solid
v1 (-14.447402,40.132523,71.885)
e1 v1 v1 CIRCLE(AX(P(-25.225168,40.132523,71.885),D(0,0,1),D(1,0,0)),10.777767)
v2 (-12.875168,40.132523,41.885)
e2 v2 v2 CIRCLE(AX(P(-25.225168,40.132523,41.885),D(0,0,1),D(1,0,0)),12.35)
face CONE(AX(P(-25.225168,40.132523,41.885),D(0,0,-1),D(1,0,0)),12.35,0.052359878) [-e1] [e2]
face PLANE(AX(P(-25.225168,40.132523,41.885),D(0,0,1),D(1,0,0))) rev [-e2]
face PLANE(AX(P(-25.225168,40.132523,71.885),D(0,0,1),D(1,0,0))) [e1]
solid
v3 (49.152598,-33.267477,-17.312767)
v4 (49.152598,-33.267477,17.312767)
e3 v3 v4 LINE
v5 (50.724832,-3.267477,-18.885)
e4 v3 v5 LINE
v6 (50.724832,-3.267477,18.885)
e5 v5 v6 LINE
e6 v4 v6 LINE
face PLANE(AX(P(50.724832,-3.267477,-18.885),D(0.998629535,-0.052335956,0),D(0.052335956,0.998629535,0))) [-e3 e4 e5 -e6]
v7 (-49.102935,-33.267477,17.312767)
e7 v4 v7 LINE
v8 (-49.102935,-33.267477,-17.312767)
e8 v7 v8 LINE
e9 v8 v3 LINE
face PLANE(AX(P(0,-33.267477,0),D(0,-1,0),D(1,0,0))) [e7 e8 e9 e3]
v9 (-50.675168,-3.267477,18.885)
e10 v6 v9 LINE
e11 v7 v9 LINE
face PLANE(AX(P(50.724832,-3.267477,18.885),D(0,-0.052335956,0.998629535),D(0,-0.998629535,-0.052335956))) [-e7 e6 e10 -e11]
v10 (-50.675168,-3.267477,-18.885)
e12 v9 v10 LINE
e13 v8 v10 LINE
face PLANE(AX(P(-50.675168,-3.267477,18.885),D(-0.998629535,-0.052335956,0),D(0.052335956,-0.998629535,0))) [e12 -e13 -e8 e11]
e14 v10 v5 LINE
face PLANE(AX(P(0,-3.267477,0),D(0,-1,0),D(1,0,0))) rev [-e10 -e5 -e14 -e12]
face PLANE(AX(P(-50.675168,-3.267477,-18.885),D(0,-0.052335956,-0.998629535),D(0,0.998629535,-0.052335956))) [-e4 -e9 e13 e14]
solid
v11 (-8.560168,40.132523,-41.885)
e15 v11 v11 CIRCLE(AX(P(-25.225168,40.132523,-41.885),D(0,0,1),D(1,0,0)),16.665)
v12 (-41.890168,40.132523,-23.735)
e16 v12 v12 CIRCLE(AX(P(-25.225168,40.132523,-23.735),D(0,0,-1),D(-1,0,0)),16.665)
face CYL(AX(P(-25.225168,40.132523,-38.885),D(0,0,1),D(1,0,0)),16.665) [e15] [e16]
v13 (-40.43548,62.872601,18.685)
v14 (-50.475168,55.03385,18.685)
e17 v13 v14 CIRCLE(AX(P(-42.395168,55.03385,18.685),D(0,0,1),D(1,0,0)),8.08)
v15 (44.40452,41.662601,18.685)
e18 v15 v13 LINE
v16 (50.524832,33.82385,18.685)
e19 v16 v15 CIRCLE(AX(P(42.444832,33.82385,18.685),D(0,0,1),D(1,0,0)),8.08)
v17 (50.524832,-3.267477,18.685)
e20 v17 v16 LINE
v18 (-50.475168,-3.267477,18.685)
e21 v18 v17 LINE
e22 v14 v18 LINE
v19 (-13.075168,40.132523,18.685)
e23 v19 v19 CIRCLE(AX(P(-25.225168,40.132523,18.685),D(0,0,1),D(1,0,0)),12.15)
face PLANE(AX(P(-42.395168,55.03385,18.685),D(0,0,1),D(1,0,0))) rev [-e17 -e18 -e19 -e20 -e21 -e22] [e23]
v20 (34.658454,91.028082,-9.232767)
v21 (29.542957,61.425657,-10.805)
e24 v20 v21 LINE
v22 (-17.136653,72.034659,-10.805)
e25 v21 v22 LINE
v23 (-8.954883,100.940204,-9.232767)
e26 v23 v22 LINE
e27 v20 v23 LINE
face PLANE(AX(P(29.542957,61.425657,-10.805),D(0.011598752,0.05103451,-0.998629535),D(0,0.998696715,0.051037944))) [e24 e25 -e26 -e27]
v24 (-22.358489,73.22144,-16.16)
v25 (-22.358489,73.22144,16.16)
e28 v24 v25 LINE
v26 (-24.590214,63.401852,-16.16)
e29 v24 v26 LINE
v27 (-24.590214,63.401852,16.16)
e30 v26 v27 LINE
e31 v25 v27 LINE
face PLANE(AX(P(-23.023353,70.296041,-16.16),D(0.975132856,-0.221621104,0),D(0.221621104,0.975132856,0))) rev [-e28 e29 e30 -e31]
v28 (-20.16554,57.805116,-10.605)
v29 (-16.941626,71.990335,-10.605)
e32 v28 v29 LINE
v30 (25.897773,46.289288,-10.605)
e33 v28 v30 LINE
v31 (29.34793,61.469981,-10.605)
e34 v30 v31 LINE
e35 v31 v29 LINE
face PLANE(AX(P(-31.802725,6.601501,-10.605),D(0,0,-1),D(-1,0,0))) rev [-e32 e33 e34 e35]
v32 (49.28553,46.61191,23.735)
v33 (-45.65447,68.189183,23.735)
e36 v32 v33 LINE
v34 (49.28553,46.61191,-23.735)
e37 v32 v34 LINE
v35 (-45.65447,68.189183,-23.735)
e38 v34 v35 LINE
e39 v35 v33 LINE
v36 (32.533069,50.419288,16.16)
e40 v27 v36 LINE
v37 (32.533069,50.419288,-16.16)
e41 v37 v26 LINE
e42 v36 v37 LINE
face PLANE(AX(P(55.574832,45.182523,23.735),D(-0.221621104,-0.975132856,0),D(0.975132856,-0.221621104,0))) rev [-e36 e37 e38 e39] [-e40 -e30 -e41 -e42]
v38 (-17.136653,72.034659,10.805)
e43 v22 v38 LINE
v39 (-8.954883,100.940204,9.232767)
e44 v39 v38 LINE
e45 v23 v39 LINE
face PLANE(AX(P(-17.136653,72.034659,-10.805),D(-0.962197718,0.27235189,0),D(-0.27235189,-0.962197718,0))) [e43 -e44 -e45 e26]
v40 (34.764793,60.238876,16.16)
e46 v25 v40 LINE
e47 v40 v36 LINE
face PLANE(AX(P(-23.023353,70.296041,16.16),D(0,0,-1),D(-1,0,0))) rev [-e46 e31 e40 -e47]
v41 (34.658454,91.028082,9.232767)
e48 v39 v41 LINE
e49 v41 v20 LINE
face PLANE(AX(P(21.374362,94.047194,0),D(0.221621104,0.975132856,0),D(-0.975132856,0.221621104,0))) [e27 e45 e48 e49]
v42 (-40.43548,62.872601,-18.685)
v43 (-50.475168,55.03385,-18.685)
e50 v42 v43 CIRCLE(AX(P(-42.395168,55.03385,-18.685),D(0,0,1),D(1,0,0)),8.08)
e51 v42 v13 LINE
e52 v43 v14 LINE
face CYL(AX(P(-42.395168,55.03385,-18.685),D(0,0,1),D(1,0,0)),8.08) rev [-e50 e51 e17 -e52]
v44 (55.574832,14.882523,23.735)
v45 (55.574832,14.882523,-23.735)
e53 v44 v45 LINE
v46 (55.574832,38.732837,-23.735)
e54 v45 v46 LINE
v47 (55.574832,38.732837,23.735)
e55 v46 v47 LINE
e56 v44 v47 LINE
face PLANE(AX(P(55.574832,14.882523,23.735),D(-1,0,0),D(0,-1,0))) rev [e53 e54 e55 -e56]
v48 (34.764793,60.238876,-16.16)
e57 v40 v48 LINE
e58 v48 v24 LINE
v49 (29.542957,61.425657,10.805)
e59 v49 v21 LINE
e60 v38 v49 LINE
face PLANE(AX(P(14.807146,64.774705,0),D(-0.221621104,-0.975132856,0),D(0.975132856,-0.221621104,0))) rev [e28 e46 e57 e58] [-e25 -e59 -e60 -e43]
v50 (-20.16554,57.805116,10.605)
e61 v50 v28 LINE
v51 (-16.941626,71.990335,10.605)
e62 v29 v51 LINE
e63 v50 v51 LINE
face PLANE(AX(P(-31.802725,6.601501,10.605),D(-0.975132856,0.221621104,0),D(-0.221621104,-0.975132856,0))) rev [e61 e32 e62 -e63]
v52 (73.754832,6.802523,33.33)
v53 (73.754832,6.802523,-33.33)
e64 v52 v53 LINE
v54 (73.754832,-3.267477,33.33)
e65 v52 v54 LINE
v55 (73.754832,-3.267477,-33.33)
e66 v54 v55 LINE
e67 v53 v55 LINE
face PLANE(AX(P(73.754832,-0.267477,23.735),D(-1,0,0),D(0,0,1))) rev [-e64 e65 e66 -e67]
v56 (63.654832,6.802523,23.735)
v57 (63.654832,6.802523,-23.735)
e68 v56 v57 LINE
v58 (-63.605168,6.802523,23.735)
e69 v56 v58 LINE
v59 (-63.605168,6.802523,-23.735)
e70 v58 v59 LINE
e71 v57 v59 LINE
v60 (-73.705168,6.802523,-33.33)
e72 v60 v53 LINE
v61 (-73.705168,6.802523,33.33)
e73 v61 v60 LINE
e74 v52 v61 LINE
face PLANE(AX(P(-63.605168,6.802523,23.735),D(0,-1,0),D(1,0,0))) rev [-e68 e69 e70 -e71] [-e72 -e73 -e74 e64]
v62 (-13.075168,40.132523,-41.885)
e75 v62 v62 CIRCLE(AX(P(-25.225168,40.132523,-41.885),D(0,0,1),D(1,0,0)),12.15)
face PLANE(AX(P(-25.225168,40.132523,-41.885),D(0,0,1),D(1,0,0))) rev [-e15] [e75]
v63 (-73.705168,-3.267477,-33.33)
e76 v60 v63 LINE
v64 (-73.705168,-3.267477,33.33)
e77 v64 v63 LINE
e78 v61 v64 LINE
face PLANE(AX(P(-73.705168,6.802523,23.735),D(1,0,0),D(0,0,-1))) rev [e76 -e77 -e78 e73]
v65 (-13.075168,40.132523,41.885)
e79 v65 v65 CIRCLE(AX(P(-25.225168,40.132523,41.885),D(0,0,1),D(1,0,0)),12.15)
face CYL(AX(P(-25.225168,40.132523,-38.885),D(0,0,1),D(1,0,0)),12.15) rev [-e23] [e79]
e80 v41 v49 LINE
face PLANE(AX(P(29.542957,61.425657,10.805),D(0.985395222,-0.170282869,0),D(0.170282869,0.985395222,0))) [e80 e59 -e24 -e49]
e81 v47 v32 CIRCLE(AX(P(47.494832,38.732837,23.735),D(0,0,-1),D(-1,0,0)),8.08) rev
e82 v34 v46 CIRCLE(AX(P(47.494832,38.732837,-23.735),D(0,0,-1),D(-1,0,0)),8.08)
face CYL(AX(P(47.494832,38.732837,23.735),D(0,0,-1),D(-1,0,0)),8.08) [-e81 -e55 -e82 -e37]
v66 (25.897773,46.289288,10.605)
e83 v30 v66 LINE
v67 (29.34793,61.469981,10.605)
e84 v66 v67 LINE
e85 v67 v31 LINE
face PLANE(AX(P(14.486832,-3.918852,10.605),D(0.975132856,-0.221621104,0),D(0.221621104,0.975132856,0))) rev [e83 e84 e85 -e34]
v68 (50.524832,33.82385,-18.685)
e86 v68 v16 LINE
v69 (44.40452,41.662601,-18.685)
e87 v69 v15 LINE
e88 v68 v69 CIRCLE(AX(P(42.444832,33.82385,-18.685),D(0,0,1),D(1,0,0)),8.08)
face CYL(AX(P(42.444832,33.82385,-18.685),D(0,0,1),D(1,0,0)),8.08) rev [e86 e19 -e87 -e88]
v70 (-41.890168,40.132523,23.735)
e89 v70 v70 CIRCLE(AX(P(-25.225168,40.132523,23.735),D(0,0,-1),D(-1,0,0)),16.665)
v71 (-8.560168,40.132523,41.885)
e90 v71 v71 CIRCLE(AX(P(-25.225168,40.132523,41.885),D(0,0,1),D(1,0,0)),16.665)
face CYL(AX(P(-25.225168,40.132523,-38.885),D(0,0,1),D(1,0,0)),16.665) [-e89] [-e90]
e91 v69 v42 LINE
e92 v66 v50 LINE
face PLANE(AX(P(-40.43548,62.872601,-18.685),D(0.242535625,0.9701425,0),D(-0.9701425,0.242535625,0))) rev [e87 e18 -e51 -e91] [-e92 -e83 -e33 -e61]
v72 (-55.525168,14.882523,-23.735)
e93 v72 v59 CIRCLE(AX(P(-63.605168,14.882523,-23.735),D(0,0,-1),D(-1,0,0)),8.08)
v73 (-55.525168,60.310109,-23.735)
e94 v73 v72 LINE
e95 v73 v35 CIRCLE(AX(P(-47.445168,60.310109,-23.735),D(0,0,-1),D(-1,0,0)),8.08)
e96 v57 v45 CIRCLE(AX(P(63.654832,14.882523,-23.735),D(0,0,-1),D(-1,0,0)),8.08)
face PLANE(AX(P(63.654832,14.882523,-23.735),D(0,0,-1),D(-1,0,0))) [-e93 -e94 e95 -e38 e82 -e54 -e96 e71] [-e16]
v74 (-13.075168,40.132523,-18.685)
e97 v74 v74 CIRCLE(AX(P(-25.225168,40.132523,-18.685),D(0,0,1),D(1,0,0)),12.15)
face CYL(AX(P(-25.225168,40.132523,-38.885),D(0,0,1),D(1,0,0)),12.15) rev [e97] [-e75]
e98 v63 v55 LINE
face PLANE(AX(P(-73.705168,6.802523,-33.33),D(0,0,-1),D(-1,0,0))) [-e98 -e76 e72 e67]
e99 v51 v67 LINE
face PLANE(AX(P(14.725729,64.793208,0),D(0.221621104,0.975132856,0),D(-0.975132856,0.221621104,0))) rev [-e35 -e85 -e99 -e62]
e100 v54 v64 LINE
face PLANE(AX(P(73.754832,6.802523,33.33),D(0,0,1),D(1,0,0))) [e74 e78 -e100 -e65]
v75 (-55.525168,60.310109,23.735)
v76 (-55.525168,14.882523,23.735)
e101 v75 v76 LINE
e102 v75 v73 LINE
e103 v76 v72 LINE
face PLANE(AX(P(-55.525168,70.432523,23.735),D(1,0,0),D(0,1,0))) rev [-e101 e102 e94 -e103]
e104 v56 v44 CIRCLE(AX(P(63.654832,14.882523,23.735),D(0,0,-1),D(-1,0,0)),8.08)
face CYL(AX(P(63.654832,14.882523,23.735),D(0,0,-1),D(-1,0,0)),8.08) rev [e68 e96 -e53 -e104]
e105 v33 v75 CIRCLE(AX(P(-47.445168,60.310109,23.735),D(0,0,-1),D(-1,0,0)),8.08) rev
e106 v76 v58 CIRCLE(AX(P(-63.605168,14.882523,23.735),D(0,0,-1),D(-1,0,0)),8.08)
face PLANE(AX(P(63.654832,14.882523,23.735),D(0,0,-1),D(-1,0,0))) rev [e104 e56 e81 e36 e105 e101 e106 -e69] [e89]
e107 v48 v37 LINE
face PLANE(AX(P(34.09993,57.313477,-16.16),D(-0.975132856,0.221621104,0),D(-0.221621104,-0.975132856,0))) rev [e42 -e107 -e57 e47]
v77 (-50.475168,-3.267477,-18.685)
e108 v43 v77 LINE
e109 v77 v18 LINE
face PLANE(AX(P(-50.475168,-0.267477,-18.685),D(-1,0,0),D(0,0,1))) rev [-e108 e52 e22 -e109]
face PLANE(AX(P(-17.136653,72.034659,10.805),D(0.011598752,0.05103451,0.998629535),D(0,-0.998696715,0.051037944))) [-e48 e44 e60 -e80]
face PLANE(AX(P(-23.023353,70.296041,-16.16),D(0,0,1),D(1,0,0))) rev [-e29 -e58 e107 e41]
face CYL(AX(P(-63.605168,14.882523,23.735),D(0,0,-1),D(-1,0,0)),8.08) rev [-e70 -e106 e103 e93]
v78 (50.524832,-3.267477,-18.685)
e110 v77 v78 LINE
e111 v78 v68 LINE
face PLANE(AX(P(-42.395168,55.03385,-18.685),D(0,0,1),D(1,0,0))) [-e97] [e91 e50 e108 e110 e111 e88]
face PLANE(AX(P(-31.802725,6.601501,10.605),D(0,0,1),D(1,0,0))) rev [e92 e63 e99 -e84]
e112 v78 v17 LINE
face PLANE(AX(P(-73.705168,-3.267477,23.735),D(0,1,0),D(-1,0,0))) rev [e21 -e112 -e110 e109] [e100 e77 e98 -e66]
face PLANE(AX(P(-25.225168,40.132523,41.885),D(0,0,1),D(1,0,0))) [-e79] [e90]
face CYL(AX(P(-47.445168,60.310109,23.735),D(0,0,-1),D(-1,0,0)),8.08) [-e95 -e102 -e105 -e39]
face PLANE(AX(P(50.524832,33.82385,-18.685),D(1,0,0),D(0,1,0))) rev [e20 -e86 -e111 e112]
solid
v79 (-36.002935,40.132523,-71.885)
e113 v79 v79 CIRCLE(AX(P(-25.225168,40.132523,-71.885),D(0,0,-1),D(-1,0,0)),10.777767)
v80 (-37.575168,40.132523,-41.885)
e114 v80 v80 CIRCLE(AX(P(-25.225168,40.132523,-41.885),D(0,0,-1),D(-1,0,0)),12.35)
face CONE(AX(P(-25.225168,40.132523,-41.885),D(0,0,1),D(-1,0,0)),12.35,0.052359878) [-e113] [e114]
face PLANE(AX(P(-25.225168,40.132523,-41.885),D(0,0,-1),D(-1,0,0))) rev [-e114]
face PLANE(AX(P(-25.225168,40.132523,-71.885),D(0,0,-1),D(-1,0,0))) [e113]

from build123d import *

# Parameters (mm, degrees)
BOSS_EXTRUDE1_DEPTH      = 23.5
BOSS_EXTRUDE2_DEPTH      = 15
BOSS_EXTRUDE2_DEPTH_BACK = 62
SKETCH2_R                = 16.5
CUT_EXTRUDE1_DEPTH       = 18.5
SKETCH4_R                = 15
CUT_EXTRUDE2_DEPTH       = 128.114121953
FILLET1_R                = 8
SKETCH5_W                = 58
SKETCH5_H                = 32
BOSS_EXTRUDE3_DEPTH      = 7
CUT_EXTRUDE4_REACH       = 115.269
SKETCH6_W                = 47
SKETCH6_H                = 21
SKETCH7_W                = 146
SKETCH7_H                = 66
SKETCH7_W_2              = 100
SKETCH7_H_2              = 37
BOSS_EXTRUDE5_DEPTH      = 7
SCALE1_SCALE             = 1.01
MOVE_START               = -33.33
MOVE_FACE1_OUTLINE_W     = 147.46
MOVE_FACE1_OUTLINE_H     = 3
MOVE_FACE1_OUTLINE_R     = 15.15
MOVE_FACE1_OUTLINE_R_2   = 12.15
MOVE_FACE1_DEPTH         = 14.645
MOVE_START_2             = 18.685
MOVE_FACE1_2_OUTLINE_W   = 147.46
MOVE_FACE1_2_OUTLINE_H   = 3
MOVE_FACE1_2_OUTLINE_R   = 15.15
MOVE_FACE1_2_OUTLINE_R_2 = 12.15
MOVE_FACE1_2_DEPTH       = 14.645
MOVE_START_3             = -16.16
MOVE_FACE1_3_OUTLINE_W   = 23.23
MOVE_FACE1_3_OUTLINE_H   = 3
MOVE_FACE1_3_DEPTH       = 32.32
MOVE_START_4             = -41.885
MOVE_FACE1_4_OUTLINE_R   = 16.665
MOVE_FACE1_4_OUTLINE_R_2 = 12.15
MOVE_FACE1_4_DEPTH       = 8.555
MOVE_START_5             = 33.33
MOVE_FACE1_5_OUTLINE_R   = 16.665
MOVE_FACE1_5_OUTLINE_R_2 = 12.15
MOVE_FACE1_5_DEPTH       = 8.555
MOVE_FACE1_6_DEPTH       = 5.555
MOVE_START_6             = 10.605
MOVE_FACE1_7_DEPTH       = 5.555
MOVE_START_7             = -18.685
MOVE_FACE1_8_OUTLINE_W   = 23.23
MOVE_FACE1_8_OUTLINE_H   = 3
MOVE_FACE1_8_DEPTH       = 37.37
SKETCH8_R                = 12.35
BOSS_EXTRUDE6_DEPTH      = 30
BOSS_EXTRUDE6_TAPER      = 3
SKETCH9_R                = 12.35
BOSS_EXTRUDE7_DEPTH      = 30
BOSS_EXTRUDE7_TAPER      = 3
SKETCH12_W               = 47.87
SKETCH12_H               = 21.61
BOSS_EXTRUDE10_DEPTH     = 30
BOSS_EXTRUDE10_TAPER     = 3
SKETCH11_W               = 101.4
SKETCH11_H               = 37.77
BOSS_EXTRUDE9_DEPTH      = 30
BOSS_EXTRUDE9_TAPER      = 3


# Read off the part's stored shape, not the designer's step: Move Face1
with BuildPart() as part:
    # Sketch1 → Boss-Extrude1 (new, symmetric)
    with BuildSketch(Plane.XY):
        with BuildLine():
            Line((-73, 0), (73, 0))
            Line((73, 0), (73, 7))
            Line((73, 7), (63, 7))
            ThreePointArc((63, 7), (57.343145751, 9.343145751), (55, 15))
            Line((55, 15), (55, 45))
            Line((55, 45), (-55, 70))
            Line((-55, 70), (-55, 15))
            ThreePointArc((-55, 15), (-57.343145751, 9.343145751), (-63, 7))
            Line((-63, 7), (-73, 7))
            Line((-73, 7), (-73, 0))
        make_face()
    extrude(amount=BOSS_EXTRUDE1_DEPTH, both=True)

    # Sketch2 → Boss-Extrude2 (add, two sides: drawn at the far end of the back side and taken through both)
    with BuildSketch(Plane.XY.offset(23.5).offset(-BOSS_EXTRUDE2_DEPTH_BACK)):
        with Locations((-25, 40)):
            Circle(SKETCH2_R)
    extrude(amount=BOSS_EXTRUDE2_DEPTH + BOSS_EXTRUDE2_DEPTH_BACK)

    # Sketch3 → Cut-Extrude1 (cut, symmetric)
    with BuildSketch(Plane.XY):
        with BuildLine():
            Line((-50, 0), (-50, 54.753788749))
            ThreePointArc((-50, 54.753788749), (-46.923297675, 61.059432253), (-40.059715, 62.51492875))
            Line((-40.059715, 62.51492875), (43.940285, 41.51492875))
            ThreePointArc((43.940285, 41.51492875), (48.305643504, 38.677086424), (50, 33.753788749))
            Line((50, 33.753788749), (50, 0))
            Line((50, 0), (-50, 0))
        make_face()
    extrude(amount=CUT_EXTRUDE1_DEPTH, both=True, mode=Mode.SUBTRACT)

    # Sketch4 → Cut-Extrude2 (cut, through all)
    with BuildSketch(Plane.XY.offset(38.5)):
        with Locations((-25, 40)):
            Circle(SKETCH4_R)
    extrude(amount=-CUT_EXTRUDE2_DEPTH, mode=Mode.SUBTRACT)

    # Fillet1
    fillet1_edges = [part.edges().sort_by_distance(p)[0] for p in [
        (-55, 70, 0),
        (55, 45, 0),
    ]]
    fillet(fillet1_edges, radius=FILLET1_R)

    # Sketch5 → Boss-Extrude3 (add)
    with BuildSketch(Plane(origin=(12.42632613, 54.675834971, 0), x_dir=(0.9751328557914598, -0.2216211035889682, 0), z_dir=(0.22162110358896822, 0.9751328557914599, 0))):
        with Locations((-8.736046198, 0)):
            Rectangle(SKETCH5_W, SKETCH5_H)
    extrude(amount=BOSS_EXTRUDE3_DEPTH)

    # Cut-Extrude4: up to this plane
    cut_extrude4_end = Plane(origin=(-40.059715, 62.51492875, -18.5), z_dir=(0.24253562503633289, 0.970142500145332, 0))
    # Sketch6 → Cut-Extrude4 (cut, up to the surface)
    with BuildSketch(Plane(origin=(13.977673855, 61.501764961, 0), x_dir=(0.9751328557914598, -0.2216211035889683, 0), z_dir=(0.2216211035889683, 0.9751328557914598, 0)), mode=Mode.PRIVATE) as cut_extrude4_sk1:
        with Locations((-8.736046198, 0)):
            Rectangle(SKETCH6_W, SKETCH6_H)
    cut_extrude4_tool1 = split(extrude(cut_extrude4_sk1.sketch, amount=-CUT_EXTRUDE4_REACH, mode=Mode.PRIVATE), bisect_by=cut_extrude4_end, keep=Keep.BOTH, mode=Mode.PRIVATE)
    add(cut_extrude4_tool1.solids().sort_by_distance((5.458868, 63.437857, 0))[0], mode=Mode.SUBTRACT)

    # Sketch7 → Boss-Extrude5 (add)
    with BuildSketch(Plane.XZ):
        Rectangle(SKETCH7_W, SKETCH7_H)
        Rectangle(SKETCH7_W_2, SKETCH7_H_2, mode=Mode.SUBTRACT)
    extrude(amount=-BOSS_EXTRUDE5_DEPTH)


with BuildPart() as part_1:
    # Scale1: scaled about (-2.483179367, 26.747657508, 0)
    add(part.part.scale(SCALE1_SCALE).moved(Location((0.024831794, -0.267476575, 0))))

    # Move Face1 outline → Move Face1 (add)
    # profile 1 of 2: a face of its own
    with BuildSketch(Plane.XY.offset(MOVE_START)):
        with Locations((0.024831794, -1.767476575)):
            Rectangle(MOVE_FACE1_OUTLINE_W, MOVE_FACE1_OUTLINE_H)
    # profile 2 of 2: a face of its own
    with BuildSketch(Plane.XY.offset(MOVE_START)):
        with Locations((-25.225168206, 40.132523425)):
            Circle(MOVE_FACE1_OUTLINE_R)
        with Locations((-25.225168206, 40.132523425)):
            Circle(MOVE_FACE1_OUTLINE_R_2, mode=Mode.SUBTRACT)
    extrude(amount=MOVE_FACE1_DEPTH)

    # Move Face1 2 outline → Move Face1 2 (add)
    # profile 1 of 2: a face of its own
    with BuildSketch(Plane.XY.offset(MOVE_START_2)):
        with Locations((0.024831794, -1.767476575)):
            Rectangle(MOVE_FACE1_2_OUTLINE_W, MOVE_FACE1_2_OUTLINE_H)
    # profile 2 of 2: a face of its own
    with BuildSketch(Plane.XY.offset(MOVE_START_2)):
        with Locations((-25.225168206, 40.132523425)):
            Circle(MOVE_FACE1_2_OUTLINE_R)
        with Locations((-25.225168206, 40.132523425)):
            Circle(MOVE_FACE1_2_OUTLINE_R_2, mode=Mode.SUBTRACT)
    extrude(amount=MOVE_FACE1_2_DEPTH)

    # Move Face1 3 outline → Move Face1 3 (add)
    with BuildSketch(Plane.XY.offset(MOVE_START_3)):
        with Locations((62.139831794, -1.767476575)):
            Rectangle(MOVE_FACE1_3_OUTLINE_W, MOVE_FACE1_3_OUTLINE_H)
        with Locations((-62.090168206, -1.767476575)):
            Rectangle(MOVE_FACE1_3_OUTLINE_W, MOVE_FACE1_3_OUTLINE_H)
        Polygon((34.099929999, 57.313477033), (34.76479331, 60.2388756), (29.347930296, 61.46998083), (28.683066985, 58.544582263), align=None)
        Polygon((-17.606489679, 69.064936051), (-16.941626368, 71.990334618), (-22.358489382, 73.221439848), (-23.023352693, 70.296041281), align=None)
    extrude(amount=MOVE_FACE1_3_DEPTH)

    # Move Face1 4 outline → Move Face1 4 (add)
    with BuildSketch(Plane.XY.offset(MOVE_START_4)):
        with Locations((-25.225168206, 40.132523425)):
            Circle(MOVE_FACE1_4_OUTLINE_R)
        with Locations((-25.225168206, 40.132523425)):
            Circle(MOVE_FACE1_4_OUTLINE_R_2, mode=Mode.SUBTRACT)
    extrude(amount=MOVE_FACE1_4_DEPTH)

    # Move Face1 5 outline → Move Face1 5 (add)
    with BuildSketch(Plane.XY.offset(MOVE_START_5)):
        with Locations((-25.225168206, 40.132523425)):
            Circle(MOVE_FACE1_5_OUTLINE_R)
        with Locations((-25.225168206, 40.132523425)):
            Circle(MOVE_FACE1_5_OUTLINE_R_2, mode=Mode.SUBTRACT)
    extrude(amount=MOVE_FACE1_5_DEPTH)

    # Move Face1 6 outline → Move Face1 6 (add)
    with BuildSketch(Plane.XY.offset(MOVE_START_3)):
        Polygon((28.683066985, 58.544582263), (29.347930296, 61.469980831), (-16.941626368, 71.990334618), (-17.606489679, 69.064936051), align=None)
    extrude(amount=MOVE_FACE1_6_DEPTH)

    # Move Face1 7 outline → Move Face1 7 (add)
    with BuildSketch(Plane.XY.offset(MOVE_START_6)):
        Polygon((28.683066985, 58.544582263), (29.347930296, 61.469980831), (-16.941626368, 71.990334618), (-17.606489679, 69.064936051), align=None)
    extrude(amount=MOVE_FACE1_7_DEPTH)

    # Move Face1 8 outline → Move Face1 8 (add)
    with BuildSketch(Plane.XY.offset(MOVE_START_7)):
        with Locations((62.139831794, -1.767476575)):
            Rectangle(MOVE_FACE1_8_OUTLINE_W, MOVE_FACE1_8_OUTLINE_H)
        with Locations((-62.090168206, -1.767476575)):
            Rectangle(MOVE_FACE1_8_OUTLINE_W, MOVE_FACE1_8_OUTLINE_H)
    extrude(amount=MOVE_FACE1_8_DEPTH)

    # Sketch12 → Boss-Extrude10 (add)
    with BuildSketch(Plane(origin=(14.725729172, 64.793208359, 0), x_dir=(0.9751328557914598, -0.2216211035889683, 0), z_dir=(0.2216211035889683, 0.9751328557914598, 0))):
        with Locations((-8.739913908, 0)):
            Rectangle(SKETCH12_W, SKETCH12_H)
    extrude(amount=BOSS_EXTRUDE10_DEPTH, taper=BOSS_EXTRUDE10_TAPER)


with BuildPart() as body_2:
    # Sketch8 → Boss-Extrude6 (new body)
    with BuildSketch(Plane.XY.offset(41.885)):
        with Locations((-25.225168206, 40.132523425)):
            Circle(SKETCH8_R)
    extrude(amount=BOSS_EXTRUDE6_DEPTH, taper=BOSS_EXTRUDE6_TAPER)


with BuildPart() as body_3:
    # Sketch9 → Boss-Extrude7 (new body)
    with BuildSketch(Plane(origin=(0, 0, -41.885), x_dir=(-1, 0, 0), z_dir=(0, 0, -1))):
        with Locations((25.225168206, 40.132523425)):
            Circle(SKETCH9_R)
    extrude(amount=BOSS_EXTRUDE7_DEPTH, taper=BOSS_EXTRUDE7_TAPER)


with BuildPart() as body_4:
    # Sketch11 → Boss-Extrude9 (new body)
    with BuildSketch(Plane.XZ.offset(3.267476575)):
        with Locations((0.024831794, 0)):
            Rectangle(SKETCH11_W, SKETCH11_H)
    extrude(amount=BOSS_EXTRUDE9_DEPTH, taper=BOSS_EXTRUDE9_TAPER)


solid = Compound([part_1.part, body_2.part, body_3.part, body_4.part])
